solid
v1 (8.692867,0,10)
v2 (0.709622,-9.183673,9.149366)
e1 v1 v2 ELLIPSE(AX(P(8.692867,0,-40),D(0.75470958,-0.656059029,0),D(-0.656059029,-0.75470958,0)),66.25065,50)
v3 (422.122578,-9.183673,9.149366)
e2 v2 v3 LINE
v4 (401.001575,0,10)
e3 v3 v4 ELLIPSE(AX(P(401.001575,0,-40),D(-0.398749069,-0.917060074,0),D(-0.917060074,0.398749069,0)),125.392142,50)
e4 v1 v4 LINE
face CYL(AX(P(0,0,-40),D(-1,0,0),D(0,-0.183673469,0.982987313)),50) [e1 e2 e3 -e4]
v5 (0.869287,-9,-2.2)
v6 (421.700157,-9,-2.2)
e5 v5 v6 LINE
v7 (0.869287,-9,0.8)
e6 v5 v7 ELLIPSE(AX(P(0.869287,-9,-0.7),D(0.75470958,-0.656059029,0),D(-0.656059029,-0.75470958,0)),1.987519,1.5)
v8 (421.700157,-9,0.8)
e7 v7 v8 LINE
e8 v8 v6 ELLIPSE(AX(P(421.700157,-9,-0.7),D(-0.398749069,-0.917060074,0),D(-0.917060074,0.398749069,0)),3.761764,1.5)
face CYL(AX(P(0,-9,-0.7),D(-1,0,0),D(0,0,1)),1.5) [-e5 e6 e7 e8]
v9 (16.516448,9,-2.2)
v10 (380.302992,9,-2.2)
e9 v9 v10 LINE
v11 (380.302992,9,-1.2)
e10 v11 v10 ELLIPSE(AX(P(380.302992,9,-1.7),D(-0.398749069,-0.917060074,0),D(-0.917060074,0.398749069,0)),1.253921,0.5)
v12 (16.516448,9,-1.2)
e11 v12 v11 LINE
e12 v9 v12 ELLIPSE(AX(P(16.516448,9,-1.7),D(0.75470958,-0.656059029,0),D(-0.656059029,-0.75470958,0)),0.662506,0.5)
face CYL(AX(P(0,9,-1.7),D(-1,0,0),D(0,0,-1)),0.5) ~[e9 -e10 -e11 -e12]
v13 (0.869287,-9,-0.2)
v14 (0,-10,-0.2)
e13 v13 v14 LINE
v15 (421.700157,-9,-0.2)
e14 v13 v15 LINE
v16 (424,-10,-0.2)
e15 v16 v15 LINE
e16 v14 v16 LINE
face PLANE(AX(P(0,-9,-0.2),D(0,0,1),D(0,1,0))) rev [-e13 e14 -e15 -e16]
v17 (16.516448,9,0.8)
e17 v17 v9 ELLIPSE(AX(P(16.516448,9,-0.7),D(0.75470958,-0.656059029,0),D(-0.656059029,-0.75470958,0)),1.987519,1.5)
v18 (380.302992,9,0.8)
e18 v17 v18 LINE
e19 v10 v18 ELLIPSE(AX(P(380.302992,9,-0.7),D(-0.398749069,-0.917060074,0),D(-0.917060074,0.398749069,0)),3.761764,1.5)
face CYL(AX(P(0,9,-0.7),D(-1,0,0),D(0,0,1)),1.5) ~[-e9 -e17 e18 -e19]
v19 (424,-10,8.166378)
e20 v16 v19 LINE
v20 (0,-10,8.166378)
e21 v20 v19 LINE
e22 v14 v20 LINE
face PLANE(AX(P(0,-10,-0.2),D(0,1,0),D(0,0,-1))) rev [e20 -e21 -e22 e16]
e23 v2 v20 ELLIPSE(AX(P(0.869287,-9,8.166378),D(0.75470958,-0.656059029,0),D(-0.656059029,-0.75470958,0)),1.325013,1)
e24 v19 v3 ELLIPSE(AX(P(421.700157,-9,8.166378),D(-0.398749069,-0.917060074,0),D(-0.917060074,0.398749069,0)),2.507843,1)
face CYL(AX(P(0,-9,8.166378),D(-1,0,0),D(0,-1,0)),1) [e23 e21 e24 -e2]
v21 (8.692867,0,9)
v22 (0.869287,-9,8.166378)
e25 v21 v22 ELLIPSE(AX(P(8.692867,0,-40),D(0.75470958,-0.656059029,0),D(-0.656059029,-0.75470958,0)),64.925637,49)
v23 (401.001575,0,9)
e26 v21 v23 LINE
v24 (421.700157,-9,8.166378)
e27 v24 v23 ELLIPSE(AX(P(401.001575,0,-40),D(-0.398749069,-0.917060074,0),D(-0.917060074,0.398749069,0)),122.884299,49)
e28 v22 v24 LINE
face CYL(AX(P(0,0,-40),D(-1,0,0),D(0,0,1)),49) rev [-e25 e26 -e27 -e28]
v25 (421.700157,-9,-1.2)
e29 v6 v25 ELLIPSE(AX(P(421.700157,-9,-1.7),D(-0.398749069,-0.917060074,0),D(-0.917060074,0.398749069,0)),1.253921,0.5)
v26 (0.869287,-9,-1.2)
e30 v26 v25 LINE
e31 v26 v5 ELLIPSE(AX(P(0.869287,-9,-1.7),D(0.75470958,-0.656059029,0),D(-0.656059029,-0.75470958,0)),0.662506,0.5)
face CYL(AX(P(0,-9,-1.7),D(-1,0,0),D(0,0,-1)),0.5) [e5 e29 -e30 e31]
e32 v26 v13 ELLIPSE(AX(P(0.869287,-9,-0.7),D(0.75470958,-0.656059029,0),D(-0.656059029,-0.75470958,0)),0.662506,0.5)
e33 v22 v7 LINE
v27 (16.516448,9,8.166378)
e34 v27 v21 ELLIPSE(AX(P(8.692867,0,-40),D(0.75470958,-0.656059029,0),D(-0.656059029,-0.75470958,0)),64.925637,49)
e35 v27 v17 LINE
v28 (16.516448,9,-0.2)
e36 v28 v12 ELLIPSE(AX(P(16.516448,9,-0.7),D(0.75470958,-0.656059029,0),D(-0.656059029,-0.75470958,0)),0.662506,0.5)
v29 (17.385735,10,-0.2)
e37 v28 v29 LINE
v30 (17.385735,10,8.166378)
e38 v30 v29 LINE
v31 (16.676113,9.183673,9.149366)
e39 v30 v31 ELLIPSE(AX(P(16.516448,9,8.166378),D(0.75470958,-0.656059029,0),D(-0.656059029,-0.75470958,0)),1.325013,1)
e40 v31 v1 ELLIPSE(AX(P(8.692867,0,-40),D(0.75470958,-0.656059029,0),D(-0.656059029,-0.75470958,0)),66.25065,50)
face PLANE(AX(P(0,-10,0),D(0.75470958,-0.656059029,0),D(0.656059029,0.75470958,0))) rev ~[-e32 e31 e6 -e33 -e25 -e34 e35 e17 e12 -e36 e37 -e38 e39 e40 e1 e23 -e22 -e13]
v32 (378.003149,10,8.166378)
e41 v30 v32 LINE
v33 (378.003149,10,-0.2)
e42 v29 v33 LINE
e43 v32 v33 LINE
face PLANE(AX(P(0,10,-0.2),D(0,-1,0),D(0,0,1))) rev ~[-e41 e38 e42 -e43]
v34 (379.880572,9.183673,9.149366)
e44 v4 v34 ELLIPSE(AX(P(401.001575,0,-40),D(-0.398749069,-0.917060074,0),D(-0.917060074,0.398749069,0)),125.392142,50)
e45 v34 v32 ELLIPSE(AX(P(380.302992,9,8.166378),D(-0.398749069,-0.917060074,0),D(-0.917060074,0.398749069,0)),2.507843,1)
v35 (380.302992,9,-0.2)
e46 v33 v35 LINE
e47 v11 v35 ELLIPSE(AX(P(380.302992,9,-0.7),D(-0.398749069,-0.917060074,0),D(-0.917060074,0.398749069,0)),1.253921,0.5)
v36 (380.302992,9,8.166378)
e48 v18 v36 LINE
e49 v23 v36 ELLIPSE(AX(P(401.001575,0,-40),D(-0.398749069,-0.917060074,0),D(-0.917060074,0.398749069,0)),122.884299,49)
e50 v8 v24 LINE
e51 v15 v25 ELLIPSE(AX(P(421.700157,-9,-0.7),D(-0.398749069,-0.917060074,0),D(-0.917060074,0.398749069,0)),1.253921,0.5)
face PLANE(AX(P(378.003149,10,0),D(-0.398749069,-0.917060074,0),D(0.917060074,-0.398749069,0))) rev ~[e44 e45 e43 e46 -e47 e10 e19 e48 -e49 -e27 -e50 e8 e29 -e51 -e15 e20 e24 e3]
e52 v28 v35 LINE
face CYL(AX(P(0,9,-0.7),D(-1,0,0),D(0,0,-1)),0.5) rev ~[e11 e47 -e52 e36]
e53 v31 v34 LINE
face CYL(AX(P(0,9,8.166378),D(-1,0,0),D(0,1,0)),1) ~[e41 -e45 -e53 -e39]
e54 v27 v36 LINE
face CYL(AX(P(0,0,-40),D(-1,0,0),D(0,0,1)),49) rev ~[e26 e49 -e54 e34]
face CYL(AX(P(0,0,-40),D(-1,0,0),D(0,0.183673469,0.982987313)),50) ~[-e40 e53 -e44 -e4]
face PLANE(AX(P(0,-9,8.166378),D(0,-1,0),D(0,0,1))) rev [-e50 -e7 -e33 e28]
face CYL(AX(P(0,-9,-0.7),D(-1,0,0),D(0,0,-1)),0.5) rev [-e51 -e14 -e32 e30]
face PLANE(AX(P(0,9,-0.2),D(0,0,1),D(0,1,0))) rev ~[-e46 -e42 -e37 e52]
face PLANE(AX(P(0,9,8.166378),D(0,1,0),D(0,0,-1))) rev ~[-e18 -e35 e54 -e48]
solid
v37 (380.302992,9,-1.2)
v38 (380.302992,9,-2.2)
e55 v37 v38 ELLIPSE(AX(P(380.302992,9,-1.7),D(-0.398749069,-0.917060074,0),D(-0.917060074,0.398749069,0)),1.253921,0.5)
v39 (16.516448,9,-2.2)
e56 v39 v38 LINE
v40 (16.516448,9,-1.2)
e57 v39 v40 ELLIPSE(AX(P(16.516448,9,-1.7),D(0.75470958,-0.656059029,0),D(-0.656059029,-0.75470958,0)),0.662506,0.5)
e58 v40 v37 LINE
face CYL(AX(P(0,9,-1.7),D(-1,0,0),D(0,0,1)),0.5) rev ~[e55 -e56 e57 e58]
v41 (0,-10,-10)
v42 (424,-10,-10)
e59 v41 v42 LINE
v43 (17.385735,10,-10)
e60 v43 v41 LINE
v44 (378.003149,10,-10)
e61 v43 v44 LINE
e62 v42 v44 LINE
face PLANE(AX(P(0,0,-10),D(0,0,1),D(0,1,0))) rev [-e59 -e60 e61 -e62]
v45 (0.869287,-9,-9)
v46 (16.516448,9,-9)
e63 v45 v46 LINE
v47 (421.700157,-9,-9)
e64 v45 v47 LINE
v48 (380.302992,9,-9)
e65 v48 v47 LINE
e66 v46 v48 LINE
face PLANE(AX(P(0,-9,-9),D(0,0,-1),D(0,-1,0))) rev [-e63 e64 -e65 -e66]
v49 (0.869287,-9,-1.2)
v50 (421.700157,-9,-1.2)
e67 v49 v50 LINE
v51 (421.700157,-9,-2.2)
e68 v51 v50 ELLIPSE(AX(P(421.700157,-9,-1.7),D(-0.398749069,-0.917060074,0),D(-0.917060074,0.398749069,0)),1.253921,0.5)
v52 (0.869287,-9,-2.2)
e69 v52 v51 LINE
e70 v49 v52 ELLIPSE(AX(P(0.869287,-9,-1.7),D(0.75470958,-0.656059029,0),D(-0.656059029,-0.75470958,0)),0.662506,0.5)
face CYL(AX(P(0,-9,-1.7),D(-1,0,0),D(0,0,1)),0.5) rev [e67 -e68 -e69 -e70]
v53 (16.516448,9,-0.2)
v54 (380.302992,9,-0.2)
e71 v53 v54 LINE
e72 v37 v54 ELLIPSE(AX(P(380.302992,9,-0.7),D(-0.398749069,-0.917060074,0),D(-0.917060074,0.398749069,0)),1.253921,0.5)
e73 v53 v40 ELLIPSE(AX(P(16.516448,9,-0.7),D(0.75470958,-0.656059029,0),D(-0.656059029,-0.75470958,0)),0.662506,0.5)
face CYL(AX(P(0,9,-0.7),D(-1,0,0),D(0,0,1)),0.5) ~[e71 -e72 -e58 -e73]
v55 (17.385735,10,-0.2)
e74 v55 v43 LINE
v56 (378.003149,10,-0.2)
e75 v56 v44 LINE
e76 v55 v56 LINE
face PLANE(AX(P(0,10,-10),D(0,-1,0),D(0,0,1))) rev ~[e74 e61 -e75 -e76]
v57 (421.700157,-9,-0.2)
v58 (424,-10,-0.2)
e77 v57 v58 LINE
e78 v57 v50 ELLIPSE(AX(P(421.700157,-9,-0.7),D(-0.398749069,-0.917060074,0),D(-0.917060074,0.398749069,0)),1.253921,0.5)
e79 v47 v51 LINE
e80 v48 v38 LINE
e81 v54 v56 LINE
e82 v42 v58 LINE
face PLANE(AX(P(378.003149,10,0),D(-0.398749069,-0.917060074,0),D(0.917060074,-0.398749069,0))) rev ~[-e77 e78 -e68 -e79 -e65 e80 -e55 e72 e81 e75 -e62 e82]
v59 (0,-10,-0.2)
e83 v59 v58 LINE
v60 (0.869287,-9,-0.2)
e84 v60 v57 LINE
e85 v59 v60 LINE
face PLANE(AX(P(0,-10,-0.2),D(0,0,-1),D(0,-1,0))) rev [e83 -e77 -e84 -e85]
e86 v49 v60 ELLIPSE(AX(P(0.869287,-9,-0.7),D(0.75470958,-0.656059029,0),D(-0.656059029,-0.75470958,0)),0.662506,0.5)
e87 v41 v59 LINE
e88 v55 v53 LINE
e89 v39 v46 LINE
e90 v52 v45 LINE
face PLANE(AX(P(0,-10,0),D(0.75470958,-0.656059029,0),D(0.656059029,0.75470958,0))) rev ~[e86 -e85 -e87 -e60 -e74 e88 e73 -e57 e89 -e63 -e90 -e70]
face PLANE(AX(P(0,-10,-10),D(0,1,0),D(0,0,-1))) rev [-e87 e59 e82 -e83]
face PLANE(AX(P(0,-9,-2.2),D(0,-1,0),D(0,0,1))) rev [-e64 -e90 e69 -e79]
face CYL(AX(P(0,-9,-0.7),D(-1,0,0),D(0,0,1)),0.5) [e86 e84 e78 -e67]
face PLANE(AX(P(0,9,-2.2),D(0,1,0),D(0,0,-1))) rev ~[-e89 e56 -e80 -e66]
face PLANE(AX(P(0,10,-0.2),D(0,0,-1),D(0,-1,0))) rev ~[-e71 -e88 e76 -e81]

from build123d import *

# Parameters (mm, degrees)
F2_DEPTH      = 1000
F4_DEPTH      = 1000
F8_DEPTH      = 10.001
F8_DEPTH_BACK = 10.001


# Not quite as in the source:
# - ends of sketch curves that miss each other by under 0.0002 mm in the source are joined


with BuildPart() as f2:
    # F1 (on Right) → F2 (new body)
    with BuildSketch(Plane.YZ):
        with BuildLine():
            Line((0, -9), (0, -10))
            Line((0, -10), (10, -10))
            Line((10, -10), (10, -0.2))
            Line((10, -0.2), (9, -0.2))
            ThreePointArc((9, -0.2), (8.5, -0.7), (9, -1.2))
            ThreePointArc((9, -1.2), (9.5, -1.7), (9, -2.2))
            Line((9, -2.2), (9, -9))
            Line((9, -9), (0, -9))
        make_face()
    extrude(amount=F2_DEPTH)

    # F5: F2 across plane


with BuildPart() as f4:
    # F3 (on Right) → F4 (new body)
    with BuildSketch(Plane.YZ):
        with BuildLine():
            Line((9, -0.2), (10, -0.2))
            Line((10, -0.2), (10, 8.1663783152))
            ThreePointArc((10, 8.1663783152), (9.7693092582, 8.8052548802), (9.1836734694, 9.1493656277))
            ThreePointArc((9.1836734694, 9.1493656277), (4.6114920912, 9.7868872364), (0, 10))
            Line((0, 10), (0, 9))
            ThreePointArc((0, 9), (4.5192622493, 8.7911494917), (9, 8.1663783152))
            Line((9, 8.1663783152), (9, 0.8))
            ThreePointArc((9, 0.8), (7.5, -0.7), (9, -2.2))
            ThreePointArc((9, -2.2), (9.5, -1.7), (9, -1.2))
            ThreePointArc((9, -1.2), (8.5, -0.7), (9, -0.2))
        make_face()
    extrude(amount=F4_DEPTH)

    # F6: F4 across plane


with BuildPart() as f2_1:
    add(f2.part)
    add(f2.part.mirror(Plane.XZ))


with BuildPart() as f4_1:
    add(f4.part)
    add(f4.part.mirror(Plane.XZ))


with BuildPart() as f8_tool:
    # F7 (on Top) → F8 (new body, two sides)
    with BuildSketch(Plane.XY) as f8_sk:
        Polygon((0, 10), (0, 0), (0, -10), (17.3857347563, 10), align=None)
        Polygon((378.0031490553, 10), (424, -10), (1016.9613361359, -10), (1016.9613361359, 10), (709.9114895723, 10), align=None)
    extrude(amount=F8_DEPTH)
    extrude(f8_sk.sketch, amount=-F8_DEPTH_BACK)


with BuildPart() as f2_2:
    add(f2_1.part)

    # F8: cut by f8_tool
    add(f8_tool.part, mode=Mode.SUBTRACT)


with BuildPart() as f4_2:
    add(f4_1.part)

    # F8: cut by f8_tool
    add(f8_tool.part, mode=Mode.SUBTRACT)


solid = Compound([f2_2.part, f4_2.part])
